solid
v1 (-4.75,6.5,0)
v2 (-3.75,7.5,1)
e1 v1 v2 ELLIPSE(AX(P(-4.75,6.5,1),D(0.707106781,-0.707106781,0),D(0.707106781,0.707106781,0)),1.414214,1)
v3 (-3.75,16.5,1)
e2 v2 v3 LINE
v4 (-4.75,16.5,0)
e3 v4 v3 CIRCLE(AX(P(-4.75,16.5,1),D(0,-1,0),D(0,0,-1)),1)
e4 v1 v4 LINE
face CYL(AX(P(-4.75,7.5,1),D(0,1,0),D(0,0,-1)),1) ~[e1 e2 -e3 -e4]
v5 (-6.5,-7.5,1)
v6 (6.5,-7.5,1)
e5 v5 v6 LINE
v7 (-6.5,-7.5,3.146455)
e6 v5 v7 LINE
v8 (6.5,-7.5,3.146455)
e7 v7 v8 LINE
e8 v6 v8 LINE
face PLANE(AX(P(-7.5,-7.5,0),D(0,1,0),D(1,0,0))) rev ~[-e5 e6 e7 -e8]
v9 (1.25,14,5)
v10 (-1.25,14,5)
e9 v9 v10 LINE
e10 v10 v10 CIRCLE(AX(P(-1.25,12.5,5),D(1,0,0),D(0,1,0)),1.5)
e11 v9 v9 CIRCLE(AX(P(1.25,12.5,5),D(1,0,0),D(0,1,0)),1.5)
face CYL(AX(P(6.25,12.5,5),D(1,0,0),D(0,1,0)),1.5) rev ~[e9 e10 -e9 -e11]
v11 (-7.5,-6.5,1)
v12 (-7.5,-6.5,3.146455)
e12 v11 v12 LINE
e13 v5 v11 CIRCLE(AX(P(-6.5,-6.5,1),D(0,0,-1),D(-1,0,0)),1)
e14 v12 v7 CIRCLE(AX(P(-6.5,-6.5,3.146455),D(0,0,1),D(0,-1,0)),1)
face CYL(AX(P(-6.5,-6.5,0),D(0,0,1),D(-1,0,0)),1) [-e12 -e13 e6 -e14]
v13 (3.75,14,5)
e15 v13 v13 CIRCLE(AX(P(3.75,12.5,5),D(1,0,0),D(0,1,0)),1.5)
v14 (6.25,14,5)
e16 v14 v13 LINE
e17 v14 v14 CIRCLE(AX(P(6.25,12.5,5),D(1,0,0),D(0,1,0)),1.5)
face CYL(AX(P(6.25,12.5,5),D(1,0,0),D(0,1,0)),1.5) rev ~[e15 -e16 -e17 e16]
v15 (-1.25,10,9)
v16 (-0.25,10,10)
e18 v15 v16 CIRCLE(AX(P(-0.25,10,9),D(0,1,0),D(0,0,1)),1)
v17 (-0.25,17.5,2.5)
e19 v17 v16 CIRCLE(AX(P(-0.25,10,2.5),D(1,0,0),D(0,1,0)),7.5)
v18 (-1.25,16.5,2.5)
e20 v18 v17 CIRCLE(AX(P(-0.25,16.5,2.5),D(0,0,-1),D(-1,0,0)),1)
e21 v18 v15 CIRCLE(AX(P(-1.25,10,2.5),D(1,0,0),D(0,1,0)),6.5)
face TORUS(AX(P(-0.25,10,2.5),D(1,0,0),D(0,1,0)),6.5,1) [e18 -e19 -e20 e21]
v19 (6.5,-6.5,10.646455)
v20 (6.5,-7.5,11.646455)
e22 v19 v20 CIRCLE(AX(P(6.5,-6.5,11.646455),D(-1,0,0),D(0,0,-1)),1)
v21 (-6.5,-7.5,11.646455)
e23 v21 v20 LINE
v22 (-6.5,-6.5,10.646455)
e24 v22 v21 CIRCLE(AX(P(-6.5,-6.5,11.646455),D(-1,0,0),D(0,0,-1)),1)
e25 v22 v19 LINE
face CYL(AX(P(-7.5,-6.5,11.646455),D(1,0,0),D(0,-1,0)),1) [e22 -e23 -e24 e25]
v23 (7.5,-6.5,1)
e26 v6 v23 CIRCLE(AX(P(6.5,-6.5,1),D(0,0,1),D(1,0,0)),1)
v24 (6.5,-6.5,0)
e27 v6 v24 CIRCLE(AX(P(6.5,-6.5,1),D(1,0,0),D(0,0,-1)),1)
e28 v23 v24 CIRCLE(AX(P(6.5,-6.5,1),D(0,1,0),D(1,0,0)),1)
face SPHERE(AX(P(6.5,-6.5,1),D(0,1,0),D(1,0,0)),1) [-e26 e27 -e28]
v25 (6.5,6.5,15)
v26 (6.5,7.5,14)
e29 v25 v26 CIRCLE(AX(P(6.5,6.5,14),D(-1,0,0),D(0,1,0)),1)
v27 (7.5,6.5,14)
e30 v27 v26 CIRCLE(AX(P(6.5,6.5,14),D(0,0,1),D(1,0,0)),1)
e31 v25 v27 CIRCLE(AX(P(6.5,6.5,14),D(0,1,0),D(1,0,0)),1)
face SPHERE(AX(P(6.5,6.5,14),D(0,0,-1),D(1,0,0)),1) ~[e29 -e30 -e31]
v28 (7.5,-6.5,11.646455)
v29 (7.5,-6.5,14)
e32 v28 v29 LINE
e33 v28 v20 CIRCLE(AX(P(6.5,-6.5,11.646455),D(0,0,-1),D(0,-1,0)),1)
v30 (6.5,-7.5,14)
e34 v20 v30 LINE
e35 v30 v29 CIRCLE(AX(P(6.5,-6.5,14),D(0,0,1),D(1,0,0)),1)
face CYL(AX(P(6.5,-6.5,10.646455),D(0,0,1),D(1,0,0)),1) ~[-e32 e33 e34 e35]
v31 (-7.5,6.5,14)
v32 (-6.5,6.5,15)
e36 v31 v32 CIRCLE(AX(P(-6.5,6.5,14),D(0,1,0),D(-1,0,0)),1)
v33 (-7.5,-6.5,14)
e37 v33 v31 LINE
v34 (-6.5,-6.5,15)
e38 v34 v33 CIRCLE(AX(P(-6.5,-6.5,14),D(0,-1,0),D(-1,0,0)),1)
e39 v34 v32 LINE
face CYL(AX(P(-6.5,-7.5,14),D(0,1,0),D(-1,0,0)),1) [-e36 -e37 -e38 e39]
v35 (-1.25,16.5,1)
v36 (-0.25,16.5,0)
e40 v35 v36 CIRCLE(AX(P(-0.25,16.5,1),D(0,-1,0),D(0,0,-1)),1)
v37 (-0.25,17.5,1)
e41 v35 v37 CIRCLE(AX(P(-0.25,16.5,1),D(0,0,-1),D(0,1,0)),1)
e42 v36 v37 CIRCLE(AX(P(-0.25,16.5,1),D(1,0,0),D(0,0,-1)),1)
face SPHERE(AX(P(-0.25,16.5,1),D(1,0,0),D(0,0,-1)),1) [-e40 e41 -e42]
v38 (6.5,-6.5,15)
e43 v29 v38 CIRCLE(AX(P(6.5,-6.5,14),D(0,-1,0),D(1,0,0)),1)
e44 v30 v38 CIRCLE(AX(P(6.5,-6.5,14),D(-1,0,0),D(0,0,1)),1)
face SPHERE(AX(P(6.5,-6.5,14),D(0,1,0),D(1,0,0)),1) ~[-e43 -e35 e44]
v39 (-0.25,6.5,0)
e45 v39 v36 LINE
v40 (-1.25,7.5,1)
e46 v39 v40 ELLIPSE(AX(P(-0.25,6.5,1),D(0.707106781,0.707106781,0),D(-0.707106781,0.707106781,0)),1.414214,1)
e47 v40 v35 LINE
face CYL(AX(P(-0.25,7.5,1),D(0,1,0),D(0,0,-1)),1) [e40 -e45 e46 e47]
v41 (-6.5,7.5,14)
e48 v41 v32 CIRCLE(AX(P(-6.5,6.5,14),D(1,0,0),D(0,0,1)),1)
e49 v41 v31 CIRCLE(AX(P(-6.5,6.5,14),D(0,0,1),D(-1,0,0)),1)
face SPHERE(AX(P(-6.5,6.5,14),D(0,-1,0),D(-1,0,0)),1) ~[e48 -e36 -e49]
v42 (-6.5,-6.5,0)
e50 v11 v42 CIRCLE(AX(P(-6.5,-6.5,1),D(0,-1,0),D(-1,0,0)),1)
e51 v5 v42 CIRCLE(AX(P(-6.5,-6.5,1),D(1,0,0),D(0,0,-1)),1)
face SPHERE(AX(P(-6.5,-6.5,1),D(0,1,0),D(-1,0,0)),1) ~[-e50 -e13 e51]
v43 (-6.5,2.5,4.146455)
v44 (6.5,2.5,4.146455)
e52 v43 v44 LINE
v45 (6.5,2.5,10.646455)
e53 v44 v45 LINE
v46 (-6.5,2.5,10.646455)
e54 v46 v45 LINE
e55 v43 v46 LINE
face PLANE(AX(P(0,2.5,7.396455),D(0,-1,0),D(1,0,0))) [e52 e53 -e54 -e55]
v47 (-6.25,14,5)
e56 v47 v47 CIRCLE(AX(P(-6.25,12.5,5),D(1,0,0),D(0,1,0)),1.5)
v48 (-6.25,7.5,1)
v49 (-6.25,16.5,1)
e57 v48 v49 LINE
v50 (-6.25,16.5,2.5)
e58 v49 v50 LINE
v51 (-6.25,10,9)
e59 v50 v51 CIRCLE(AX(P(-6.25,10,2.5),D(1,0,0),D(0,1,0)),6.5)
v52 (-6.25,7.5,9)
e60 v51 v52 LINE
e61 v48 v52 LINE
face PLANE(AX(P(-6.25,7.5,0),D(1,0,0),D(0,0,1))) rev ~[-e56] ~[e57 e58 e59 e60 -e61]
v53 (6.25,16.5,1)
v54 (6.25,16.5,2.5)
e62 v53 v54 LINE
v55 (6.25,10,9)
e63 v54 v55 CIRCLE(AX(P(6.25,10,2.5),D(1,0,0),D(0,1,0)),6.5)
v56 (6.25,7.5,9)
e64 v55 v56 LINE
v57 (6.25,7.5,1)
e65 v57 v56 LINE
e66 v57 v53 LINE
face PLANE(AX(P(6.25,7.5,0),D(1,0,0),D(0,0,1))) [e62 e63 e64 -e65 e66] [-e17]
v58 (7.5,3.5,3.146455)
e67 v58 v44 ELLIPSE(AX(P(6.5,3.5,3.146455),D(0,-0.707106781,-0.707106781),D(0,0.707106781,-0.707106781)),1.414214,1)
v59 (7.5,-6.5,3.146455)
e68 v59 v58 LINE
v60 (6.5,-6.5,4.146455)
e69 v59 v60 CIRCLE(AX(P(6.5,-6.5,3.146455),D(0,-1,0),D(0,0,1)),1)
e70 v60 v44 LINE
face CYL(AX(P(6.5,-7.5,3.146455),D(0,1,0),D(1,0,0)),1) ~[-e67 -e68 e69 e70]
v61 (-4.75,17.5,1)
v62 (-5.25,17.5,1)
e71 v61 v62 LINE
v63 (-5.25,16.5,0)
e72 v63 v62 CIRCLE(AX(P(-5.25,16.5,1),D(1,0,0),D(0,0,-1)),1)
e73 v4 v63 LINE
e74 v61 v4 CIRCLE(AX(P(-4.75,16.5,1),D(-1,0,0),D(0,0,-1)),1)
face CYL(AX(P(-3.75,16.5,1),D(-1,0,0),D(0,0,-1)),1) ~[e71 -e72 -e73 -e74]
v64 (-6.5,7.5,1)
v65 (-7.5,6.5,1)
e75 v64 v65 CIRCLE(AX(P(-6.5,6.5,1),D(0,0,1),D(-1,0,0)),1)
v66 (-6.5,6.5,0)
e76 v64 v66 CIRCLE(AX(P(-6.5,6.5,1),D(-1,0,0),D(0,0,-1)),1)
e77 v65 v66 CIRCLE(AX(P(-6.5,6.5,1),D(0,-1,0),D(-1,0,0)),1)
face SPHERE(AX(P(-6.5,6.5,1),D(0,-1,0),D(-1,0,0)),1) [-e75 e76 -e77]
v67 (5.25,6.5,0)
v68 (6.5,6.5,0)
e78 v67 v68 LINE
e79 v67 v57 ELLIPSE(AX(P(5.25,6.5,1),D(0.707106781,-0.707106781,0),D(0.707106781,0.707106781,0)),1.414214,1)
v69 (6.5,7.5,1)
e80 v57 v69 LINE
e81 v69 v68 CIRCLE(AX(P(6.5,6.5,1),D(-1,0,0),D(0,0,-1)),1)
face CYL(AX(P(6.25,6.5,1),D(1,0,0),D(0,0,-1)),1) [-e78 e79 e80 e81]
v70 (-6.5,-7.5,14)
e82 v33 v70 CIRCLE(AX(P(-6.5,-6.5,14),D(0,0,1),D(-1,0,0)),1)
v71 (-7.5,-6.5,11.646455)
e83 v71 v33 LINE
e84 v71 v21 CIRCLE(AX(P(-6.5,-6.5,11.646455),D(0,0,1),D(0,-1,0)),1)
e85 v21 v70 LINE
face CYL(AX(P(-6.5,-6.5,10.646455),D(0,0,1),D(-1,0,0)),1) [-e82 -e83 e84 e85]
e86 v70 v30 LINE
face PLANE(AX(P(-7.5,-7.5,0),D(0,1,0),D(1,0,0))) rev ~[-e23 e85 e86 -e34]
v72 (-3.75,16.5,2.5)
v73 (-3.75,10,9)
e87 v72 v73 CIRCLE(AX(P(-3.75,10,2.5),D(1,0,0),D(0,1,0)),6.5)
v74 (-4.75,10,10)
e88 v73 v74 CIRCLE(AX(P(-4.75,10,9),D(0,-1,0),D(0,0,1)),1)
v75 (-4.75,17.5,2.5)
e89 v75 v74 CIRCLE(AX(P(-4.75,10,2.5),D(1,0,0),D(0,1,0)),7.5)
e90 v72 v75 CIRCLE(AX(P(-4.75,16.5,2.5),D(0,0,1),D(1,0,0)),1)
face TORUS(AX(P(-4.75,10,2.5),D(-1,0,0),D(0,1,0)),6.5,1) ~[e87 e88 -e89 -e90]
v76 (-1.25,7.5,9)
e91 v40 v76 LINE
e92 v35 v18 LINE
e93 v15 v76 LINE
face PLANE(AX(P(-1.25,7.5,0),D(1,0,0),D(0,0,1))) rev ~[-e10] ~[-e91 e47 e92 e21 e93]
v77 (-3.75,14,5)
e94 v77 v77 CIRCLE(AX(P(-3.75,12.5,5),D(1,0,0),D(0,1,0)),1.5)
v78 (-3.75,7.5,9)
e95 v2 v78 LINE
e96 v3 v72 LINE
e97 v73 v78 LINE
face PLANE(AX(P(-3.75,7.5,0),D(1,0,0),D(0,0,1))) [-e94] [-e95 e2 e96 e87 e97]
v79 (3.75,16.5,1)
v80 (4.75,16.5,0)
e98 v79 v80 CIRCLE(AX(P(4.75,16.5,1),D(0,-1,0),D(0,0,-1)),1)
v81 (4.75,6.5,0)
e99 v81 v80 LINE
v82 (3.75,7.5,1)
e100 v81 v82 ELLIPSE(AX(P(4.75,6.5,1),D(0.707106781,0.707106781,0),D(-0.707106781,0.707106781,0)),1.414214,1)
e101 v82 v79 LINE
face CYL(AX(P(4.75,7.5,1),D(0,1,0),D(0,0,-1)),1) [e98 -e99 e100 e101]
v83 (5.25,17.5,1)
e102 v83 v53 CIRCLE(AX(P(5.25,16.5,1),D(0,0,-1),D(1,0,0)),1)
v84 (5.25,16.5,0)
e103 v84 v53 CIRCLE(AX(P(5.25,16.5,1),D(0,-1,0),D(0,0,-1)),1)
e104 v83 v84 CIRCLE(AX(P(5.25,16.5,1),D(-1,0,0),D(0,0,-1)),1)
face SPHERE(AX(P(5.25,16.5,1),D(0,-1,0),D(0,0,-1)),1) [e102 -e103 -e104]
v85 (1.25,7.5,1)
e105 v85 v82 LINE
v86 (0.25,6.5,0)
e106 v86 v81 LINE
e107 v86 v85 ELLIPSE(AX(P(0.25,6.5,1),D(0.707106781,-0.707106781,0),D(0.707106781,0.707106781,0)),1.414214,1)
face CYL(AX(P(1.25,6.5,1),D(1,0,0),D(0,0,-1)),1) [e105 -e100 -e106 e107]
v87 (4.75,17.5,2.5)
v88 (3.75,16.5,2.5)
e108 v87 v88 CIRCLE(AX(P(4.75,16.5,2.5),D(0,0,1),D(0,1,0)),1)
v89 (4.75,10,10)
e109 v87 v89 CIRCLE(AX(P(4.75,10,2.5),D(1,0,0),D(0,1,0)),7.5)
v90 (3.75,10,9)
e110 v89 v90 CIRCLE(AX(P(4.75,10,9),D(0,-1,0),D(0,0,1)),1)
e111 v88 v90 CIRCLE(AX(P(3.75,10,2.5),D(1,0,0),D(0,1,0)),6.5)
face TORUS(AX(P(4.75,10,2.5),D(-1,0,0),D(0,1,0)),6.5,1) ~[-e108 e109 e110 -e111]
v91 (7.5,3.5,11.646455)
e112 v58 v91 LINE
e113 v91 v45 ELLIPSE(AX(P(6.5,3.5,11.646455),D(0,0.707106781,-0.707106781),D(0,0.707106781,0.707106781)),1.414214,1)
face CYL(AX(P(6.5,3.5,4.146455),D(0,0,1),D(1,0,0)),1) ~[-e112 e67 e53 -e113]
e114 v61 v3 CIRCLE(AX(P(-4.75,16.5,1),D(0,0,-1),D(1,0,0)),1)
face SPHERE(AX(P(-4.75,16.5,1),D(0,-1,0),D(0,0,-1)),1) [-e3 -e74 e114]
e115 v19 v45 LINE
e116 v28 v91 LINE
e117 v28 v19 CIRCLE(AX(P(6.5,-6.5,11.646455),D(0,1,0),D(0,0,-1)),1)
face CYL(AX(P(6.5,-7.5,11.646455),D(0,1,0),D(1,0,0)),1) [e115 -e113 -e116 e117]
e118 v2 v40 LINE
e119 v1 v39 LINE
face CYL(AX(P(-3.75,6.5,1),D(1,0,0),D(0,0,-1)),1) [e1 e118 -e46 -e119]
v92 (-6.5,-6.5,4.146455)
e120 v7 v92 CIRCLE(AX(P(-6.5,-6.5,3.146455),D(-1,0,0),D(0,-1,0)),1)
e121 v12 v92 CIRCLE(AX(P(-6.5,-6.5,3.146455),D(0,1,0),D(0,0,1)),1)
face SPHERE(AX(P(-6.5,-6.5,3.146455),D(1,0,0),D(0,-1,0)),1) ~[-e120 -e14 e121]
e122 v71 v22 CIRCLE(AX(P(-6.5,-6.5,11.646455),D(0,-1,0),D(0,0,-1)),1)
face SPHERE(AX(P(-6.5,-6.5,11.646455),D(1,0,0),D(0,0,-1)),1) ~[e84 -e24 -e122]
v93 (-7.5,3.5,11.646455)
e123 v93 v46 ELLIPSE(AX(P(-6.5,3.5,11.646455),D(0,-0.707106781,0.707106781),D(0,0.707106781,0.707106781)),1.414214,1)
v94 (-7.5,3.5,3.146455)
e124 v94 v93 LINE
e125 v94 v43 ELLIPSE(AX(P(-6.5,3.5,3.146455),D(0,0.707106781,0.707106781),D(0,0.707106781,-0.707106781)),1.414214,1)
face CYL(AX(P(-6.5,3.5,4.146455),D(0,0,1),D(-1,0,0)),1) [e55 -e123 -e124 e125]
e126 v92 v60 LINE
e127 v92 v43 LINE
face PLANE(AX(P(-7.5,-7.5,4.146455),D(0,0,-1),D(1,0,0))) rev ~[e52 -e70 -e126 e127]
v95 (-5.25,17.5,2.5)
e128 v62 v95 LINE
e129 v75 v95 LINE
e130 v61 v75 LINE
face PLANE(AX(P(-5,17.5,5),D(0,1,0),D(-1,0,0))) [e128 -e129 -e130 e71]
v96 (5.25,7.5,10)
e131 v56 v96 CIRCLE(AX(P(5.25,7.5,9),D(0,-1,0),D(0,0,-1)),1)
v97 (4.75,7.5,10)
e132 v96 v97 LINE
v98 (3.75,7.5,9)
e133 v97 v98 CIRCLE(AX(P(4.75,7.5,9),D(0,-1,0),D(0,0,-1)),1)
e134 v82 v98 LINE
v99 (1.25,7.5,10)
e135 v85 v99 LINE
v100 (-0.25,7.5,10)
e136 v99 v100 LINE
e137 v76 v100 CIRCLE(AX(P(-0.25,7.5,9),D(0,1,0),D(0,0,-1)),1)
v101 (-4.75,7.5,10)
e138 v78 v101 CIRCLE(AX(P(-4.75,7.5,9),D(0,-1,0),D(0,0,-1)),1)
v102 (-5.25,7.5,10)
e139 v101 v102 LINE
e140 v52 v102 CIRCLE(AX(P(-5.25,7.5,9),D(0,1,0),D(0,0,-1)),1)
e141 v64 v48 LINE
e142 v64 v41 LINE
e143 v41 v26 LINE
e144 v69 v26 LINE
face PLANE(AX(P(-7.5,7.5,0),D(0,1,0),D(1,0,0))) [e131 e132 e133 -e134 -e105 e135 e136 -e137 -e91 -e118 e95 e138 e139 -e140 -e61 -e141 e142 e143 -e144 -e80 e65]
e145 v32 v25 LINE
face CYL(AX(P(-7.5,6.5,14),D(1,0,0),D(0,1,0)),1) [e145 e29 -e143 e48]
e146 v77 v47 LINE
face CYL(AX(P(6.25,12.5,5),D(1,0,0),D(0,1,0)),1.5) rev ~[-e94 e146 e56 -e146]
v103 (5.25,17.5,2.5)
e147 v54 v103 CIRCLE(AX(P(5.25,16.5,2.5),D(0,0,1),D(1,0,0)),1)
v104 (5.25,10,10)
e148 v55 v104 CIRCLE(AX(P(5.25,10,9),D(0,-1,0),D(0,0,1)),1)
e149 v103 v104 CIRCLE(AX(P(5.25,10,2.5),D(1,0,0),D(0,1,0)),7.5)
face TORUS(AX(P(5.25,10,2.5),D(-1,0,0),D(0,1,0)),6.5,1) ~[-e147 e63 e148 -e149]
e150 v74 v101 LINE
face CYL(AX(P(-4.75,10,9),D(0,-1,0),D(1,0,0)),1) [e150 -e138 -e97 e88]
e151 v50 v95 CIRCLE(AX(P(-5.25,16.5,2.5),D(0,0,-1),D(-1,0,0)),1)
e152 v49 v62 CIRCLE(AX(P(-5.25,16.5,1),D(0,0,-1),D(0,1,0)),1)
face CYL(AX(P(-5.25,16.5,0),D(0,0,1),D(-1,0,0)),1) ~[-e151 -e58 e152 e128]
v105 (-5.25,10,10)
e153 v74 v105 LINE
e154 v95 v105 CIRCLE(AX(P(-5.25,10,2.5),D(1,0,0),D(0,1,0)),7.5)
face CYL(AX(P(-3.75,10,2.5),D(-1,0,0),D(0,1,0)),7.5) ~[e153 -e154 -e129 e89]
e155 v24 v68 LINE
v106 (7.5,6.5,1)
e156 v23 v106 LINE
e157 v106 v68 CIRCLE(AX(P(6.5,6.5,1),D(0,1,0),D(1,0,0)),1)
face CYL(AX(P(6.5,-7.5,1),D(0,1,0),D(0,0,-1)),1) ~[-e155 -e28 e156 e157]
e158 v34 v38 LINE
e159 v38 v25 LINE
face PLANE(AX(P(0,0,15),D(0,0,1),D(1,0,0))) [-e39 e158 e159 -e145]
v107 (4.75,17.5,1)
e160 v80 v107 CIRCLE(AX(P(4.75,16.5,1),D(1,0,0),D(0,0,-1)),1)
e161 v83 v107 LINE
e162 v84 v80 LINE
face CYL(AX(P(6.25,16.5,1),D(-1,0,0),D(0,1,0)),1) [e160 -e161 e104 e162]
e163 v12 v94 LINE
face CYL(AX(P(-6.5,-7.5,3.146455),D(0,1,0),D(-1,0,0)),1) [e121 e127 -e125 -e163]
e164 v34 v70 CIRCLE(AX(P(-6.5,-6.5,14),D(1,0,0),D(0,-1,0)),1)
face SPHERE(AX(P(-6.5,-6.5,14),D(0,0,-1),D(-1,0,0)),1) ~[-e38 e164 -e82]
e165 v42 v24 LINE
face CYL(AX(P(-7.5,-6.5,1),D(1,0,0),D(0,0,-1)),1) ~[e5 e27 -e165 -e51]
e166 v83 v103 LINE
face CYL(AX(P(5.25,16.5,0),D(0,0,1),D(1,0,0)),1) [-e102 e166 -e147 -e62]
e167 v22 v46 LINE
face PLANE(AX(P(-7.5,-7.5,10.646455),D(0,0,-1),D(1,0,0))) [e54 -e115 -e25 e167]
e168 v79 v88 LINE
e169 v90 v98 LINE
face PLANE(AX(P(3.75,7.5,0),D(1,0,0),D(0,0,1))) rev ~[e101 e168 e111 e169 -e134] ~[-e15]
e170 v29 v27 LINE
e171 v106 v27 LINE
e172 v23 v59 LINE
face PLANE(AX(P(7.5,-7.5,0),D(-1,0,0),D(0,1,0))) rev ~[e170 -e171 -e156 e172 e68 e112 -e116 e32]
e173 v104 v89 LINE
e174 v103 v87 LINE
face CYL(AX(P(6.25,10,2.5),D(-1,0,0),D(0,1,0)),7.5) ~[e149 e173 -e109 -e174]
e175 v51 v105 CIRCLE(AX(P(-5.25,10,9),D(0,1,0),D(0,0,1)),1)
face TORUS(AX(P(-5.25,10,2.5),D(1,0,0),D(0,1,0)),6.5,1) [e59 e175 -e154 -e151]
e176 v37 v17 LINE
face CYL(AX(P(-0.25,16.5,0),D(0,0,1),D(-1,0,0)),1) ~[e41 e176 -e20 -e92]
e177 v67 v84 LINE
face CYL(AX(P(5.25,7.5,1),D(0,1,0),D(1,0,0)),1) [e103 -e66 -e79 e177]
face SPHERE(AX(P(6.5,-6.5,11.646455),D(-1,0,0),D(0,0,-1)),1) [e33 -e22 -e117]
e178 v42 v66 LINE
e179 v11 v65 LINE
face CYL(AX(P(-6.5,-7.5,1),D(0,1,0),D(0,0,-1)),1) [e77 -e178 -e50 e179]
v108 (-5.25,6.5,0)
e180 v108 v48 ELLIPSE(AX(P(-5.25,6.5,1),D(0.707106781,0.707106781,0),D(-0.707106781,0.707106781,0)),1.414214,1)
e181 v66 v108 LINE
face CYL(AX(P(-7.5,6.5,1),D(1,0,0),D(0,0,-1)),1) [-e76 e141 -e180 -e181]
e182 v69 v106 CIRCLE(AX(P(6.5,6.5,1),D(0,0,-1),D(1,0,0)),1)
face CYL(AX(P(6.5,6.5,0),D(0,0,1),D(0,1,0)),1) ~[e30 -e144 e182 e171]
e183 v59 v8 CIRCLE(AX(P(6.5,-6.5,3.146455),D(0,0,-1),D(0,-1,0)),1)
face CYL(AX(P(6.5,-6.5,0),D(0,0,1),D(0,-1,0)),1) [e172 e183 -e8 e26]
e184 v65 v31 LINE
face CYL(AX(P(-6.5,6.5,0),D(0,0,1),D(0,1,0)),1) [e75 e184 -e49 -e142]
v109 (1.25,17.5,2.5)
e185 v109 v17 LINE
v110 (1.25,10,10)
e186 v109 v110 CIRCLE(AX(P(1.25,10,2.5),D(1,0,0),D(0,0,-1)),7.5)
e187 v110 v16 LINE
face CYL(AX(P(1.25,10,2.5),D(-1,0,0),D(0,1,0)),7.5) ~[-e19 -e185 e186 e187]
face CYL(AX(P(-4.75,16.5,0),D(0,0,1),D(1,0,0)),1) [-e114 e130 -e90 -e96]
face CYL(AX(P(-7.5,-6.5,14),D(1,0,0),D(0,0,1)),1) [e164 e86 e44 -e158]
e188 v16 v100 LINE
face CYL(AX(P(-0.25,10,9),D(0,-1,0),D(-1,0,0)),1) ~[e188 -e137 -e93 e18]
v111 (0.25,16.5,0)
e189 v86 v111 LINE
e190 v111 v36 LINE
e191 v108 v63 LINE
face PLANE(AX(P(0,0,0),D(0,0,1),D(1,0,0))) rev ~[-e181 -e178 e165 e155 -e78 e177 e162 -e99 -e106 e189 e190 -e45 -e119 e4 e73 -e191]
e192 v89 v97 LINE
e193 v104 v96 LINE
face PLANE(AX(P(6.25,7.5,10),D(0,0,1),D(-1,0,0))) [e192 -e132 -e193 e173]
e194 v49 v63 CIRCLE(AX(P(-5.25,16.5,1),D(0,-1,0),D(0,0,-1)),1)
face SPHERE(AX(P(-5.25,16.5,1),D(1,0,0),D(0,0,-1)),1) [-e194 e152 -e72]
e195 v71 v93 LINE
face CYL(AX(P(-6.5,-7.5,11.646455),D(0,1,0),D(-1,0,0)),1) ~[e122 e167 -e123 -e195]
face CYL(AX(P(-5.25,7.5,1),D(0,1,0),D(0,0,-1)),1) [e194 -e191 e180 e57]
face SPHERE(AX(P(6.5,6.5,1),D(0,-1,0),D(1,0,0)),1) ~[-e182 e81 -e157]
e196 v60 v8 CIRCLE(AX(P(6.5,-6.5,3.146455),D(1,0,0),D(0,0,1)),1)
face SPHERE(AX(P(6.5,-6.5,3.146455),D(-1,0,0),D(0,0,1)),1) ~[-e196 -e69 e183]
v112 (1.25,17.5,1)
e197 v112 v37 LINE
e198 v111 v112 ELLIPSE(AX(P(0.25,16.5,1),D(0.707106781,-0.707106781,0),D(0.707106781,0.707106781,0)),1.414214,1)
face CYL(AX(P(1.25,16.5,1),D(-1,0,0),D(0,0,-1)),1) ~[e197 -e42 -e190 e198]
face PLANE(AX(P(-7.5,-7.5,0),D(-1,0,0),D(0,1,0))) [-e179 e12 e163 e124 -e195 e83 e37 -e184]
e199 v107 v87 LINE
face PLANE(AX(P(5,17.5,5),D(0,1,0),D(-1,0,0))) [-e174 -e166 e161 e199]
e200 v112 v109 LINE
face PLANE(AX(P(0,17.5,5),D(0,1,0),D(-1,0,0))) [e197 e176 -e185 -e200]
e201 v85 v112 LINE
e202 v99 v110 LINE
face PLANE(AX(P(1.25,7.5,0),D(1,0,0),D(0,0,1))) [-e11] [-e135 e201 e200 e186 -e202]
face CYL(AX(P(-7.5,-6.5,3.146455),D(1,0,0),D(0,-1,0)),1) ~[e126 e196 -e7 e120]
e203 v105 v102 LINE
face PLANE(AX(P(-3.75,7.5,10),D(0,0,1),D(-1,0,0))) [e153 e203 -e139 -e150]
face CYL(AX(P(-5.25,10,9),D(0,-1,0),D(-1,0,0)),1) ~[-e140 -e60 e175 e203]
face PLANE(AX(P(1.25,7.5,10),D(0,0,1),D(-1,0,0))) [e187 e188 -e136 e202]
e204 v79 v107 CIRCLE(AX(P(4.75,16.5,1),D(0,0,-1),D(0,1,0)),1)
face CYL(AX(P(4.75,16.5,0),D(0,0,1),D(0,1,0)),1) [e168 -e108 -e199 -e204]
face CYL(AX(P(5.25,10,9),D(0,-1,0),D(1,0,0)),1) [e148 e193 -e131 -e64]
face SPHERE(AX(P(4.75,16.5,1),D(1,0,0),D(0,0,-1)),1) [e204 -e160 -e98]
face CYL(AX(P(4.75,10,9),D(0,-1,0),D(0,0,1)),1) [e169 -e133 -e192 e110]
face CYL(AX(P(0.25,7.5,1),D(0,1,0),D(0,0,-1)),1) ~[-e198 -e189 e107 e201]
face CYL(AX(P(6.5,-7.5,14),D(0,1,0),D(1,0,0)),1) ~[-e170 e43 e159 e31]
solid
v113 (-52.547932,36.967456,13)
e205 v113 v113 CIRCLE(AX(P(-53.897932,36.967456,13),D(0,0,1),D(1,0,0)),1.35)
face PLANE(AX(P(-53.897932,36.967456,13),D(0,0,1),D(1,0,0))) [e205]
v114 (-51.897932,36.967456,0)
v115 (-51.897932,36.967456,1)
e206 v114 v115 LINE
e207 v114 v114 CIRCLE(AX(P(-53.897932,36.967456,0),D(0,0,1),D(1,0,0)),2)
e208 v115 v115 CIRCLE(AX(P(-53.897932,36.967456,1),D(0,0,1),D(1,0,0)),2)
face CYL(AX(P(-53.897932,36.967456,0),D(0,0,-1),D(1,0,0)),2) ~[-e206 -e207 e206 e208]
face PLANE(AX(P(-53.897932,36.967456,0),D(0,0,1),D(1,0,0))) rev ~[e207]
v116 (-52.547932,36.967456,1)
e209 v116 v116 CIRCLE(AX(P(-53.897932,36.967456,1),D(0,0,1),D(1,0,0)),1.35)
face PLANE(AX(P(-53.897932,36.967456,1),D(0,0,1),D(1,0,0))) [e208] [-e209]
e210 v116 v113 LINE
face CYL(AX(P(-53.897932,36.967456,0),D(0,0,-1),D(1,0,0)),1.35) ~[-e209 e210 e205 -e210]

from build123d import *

# Parameters (mm, degrees)
F0_W       = 15
F0_H       = 15
F1_DEPTH   = 15
F2_W       = 15
F2_H       = 6.5
F1_FACE1_W = 15
F1_FACE1_H = 15
F3_DEPTH   = 10
F4_W       = 2.5
F4_H       = 10
F5_DEPTH   = 10
F6_R       = 1.5
F7_DEPTH   = 13.751
F8_R       = 7.5
F9_R       = 1
F0_R       = 1.35
F10_DEPTH  = 13
F0_R_2     = 2
F11_DEPTH  = 1


with BuildPart() as f1:
    # F0 (on Top) → F1 (new body)
    with BuildSketch(Plane.XY):
        Rectangle(F0_W, F0_H)
    extrude(amount=F1_DEPTH)

    # F2 (on face) + F1_face1 (on face) → F3 (cut)
    with BuildSketch(Plane.XZ.offset(7.5)):
        with Locations((0, 7.3964549899)):
            Rectangle(F2_W, F2_H)
    with BuildSketch(Plane(origin=(0, 7.5, 7.5), x_dir=(-1, 0, 0), z_dir=(0, 1, 0))):
        Rectangle(F1_FACE1_W, F1_FACE1_H)
    extrude(amount=-F3_DEPTH, dir=(0, -1, 0), mode=Mode.SUBTRACT)

    # F4 (on face) → F5 (join)
    with BuildSketch(Plane(origin=(0, 7.5, 0), x_dir=(-1, 0, 0), z_dir=(0, 1, 0))):
        with Locations((-5, 5)):
            Rectangle(F4_W, F4_H)
        with Locations((0, 5)):
            Rectangle(F4_W, F4_H)
        with Locations((5, 5)):
            Rectangle(F4_W, F4_H)
    extrude(amount=F5_DEPTH)

    # F6 (on face) → F7 (cut, through all)
    with BuildSketch(Plane.YZ.offset(6.25)):
        with Locations((12.5, 5)):
            Circle(F6_R)
    extrude(amount=-F7_DEPTH, mode=Mode.SUBTRACT)

    # F8
    f8_edges = [f1.edges().sort_by_distance(p)[0] for p in [
        (5, 17.5, 10),
        (0, 17.5, 10),
        (-5, 17.5, 10),
    ]]
    fillet(f8_edges, radius=F8_R)

    # F9
    f9_edges = [f1.edges().sort_by_distance(p)[0] for p in [
        (0, -7.5, 10.646455),
        (0, -7.5, 4.146455),
        (7.5, -2.5, 4.146455),
        (7.5, -2.5, 10.646455),
        (7.5, 0, 0),
        (7.5, 7.5, 7.5),
        (7.5, 0, 15),
        (7.5, -7.5, 12.823227),
        (7.5, 2.5, 7.396455),
        (7.5, -7.5, 2.073227),
        (-7.5, 0, 0),
        (-7.5, -7.5, 2.073227),
        (-7.5, -2.5, 4.146455),
        (-7.5, 2.5, 7.396455),
        (-7.5, -2.5, 10.646455),
        (-7.5, -7.5, 12.823227),
        (-7.5, 0, 15),
        (-7.5, 7.5, 7.5),
        (0, -7.5, 15),
        (0, 7.5, 15),
        (0, -7.5, 0),
        (6.875, 7.5, 0),
        (6.25, 12.5, 0),
        (5, 17.5, 0),
        (3.75, 12.5, 0),
        (2.5, 7.5, 0),
        (1.25, 12.5, 0),
        (0, 17.5, 0),
        (-1.25, 12.5, 0),
        (-2.5, 7.5, 0),
        (-3.75, 12.5, 0),
        (-5, 17.5, 0),
        (-6.25, 12.5, 0),
        (-6.875, 7.5, 0),
        (3.75, 15.303301, 7.803301),
        (5, 17.5, 2.5),
        (5, 10, 10),
        (6.25, 15.303301, 7.803301),
        (-1.25, 15.303301, 7.803301),
        (-6.25, 15.303301, 7.803301),
        (-5, 17.5, 2.5),
        (-5, 10, 10),
        (-3.75, 15.303301, 7.803301),
    ]]
    fillet(f9_edges, radius=F9_R)


with BuildPart() as f10:
    # F0 (on Top) → F10 (new body)
    with BuildSketch(Plane.XY):
        with Locations((-53.8979321718, 36.9674563408)):
            Circle(F0_R)
    extrude(amount=F10_DEPTH)

    # F0 (on Top) → F11 (join)
    with BuildSketch(Plane.XY):
        with Locations((-53.8979321718, 36.9674563408)):
            Circle(F0_R_2)
        with Locations((-53.8979321718, 36.9674563408)):
            Circle(F0_R, mode=Mode.SUBTRACT)
    extrude(amount=F11_DEPTH)


solid = Compound([f1.part, f10.part])
